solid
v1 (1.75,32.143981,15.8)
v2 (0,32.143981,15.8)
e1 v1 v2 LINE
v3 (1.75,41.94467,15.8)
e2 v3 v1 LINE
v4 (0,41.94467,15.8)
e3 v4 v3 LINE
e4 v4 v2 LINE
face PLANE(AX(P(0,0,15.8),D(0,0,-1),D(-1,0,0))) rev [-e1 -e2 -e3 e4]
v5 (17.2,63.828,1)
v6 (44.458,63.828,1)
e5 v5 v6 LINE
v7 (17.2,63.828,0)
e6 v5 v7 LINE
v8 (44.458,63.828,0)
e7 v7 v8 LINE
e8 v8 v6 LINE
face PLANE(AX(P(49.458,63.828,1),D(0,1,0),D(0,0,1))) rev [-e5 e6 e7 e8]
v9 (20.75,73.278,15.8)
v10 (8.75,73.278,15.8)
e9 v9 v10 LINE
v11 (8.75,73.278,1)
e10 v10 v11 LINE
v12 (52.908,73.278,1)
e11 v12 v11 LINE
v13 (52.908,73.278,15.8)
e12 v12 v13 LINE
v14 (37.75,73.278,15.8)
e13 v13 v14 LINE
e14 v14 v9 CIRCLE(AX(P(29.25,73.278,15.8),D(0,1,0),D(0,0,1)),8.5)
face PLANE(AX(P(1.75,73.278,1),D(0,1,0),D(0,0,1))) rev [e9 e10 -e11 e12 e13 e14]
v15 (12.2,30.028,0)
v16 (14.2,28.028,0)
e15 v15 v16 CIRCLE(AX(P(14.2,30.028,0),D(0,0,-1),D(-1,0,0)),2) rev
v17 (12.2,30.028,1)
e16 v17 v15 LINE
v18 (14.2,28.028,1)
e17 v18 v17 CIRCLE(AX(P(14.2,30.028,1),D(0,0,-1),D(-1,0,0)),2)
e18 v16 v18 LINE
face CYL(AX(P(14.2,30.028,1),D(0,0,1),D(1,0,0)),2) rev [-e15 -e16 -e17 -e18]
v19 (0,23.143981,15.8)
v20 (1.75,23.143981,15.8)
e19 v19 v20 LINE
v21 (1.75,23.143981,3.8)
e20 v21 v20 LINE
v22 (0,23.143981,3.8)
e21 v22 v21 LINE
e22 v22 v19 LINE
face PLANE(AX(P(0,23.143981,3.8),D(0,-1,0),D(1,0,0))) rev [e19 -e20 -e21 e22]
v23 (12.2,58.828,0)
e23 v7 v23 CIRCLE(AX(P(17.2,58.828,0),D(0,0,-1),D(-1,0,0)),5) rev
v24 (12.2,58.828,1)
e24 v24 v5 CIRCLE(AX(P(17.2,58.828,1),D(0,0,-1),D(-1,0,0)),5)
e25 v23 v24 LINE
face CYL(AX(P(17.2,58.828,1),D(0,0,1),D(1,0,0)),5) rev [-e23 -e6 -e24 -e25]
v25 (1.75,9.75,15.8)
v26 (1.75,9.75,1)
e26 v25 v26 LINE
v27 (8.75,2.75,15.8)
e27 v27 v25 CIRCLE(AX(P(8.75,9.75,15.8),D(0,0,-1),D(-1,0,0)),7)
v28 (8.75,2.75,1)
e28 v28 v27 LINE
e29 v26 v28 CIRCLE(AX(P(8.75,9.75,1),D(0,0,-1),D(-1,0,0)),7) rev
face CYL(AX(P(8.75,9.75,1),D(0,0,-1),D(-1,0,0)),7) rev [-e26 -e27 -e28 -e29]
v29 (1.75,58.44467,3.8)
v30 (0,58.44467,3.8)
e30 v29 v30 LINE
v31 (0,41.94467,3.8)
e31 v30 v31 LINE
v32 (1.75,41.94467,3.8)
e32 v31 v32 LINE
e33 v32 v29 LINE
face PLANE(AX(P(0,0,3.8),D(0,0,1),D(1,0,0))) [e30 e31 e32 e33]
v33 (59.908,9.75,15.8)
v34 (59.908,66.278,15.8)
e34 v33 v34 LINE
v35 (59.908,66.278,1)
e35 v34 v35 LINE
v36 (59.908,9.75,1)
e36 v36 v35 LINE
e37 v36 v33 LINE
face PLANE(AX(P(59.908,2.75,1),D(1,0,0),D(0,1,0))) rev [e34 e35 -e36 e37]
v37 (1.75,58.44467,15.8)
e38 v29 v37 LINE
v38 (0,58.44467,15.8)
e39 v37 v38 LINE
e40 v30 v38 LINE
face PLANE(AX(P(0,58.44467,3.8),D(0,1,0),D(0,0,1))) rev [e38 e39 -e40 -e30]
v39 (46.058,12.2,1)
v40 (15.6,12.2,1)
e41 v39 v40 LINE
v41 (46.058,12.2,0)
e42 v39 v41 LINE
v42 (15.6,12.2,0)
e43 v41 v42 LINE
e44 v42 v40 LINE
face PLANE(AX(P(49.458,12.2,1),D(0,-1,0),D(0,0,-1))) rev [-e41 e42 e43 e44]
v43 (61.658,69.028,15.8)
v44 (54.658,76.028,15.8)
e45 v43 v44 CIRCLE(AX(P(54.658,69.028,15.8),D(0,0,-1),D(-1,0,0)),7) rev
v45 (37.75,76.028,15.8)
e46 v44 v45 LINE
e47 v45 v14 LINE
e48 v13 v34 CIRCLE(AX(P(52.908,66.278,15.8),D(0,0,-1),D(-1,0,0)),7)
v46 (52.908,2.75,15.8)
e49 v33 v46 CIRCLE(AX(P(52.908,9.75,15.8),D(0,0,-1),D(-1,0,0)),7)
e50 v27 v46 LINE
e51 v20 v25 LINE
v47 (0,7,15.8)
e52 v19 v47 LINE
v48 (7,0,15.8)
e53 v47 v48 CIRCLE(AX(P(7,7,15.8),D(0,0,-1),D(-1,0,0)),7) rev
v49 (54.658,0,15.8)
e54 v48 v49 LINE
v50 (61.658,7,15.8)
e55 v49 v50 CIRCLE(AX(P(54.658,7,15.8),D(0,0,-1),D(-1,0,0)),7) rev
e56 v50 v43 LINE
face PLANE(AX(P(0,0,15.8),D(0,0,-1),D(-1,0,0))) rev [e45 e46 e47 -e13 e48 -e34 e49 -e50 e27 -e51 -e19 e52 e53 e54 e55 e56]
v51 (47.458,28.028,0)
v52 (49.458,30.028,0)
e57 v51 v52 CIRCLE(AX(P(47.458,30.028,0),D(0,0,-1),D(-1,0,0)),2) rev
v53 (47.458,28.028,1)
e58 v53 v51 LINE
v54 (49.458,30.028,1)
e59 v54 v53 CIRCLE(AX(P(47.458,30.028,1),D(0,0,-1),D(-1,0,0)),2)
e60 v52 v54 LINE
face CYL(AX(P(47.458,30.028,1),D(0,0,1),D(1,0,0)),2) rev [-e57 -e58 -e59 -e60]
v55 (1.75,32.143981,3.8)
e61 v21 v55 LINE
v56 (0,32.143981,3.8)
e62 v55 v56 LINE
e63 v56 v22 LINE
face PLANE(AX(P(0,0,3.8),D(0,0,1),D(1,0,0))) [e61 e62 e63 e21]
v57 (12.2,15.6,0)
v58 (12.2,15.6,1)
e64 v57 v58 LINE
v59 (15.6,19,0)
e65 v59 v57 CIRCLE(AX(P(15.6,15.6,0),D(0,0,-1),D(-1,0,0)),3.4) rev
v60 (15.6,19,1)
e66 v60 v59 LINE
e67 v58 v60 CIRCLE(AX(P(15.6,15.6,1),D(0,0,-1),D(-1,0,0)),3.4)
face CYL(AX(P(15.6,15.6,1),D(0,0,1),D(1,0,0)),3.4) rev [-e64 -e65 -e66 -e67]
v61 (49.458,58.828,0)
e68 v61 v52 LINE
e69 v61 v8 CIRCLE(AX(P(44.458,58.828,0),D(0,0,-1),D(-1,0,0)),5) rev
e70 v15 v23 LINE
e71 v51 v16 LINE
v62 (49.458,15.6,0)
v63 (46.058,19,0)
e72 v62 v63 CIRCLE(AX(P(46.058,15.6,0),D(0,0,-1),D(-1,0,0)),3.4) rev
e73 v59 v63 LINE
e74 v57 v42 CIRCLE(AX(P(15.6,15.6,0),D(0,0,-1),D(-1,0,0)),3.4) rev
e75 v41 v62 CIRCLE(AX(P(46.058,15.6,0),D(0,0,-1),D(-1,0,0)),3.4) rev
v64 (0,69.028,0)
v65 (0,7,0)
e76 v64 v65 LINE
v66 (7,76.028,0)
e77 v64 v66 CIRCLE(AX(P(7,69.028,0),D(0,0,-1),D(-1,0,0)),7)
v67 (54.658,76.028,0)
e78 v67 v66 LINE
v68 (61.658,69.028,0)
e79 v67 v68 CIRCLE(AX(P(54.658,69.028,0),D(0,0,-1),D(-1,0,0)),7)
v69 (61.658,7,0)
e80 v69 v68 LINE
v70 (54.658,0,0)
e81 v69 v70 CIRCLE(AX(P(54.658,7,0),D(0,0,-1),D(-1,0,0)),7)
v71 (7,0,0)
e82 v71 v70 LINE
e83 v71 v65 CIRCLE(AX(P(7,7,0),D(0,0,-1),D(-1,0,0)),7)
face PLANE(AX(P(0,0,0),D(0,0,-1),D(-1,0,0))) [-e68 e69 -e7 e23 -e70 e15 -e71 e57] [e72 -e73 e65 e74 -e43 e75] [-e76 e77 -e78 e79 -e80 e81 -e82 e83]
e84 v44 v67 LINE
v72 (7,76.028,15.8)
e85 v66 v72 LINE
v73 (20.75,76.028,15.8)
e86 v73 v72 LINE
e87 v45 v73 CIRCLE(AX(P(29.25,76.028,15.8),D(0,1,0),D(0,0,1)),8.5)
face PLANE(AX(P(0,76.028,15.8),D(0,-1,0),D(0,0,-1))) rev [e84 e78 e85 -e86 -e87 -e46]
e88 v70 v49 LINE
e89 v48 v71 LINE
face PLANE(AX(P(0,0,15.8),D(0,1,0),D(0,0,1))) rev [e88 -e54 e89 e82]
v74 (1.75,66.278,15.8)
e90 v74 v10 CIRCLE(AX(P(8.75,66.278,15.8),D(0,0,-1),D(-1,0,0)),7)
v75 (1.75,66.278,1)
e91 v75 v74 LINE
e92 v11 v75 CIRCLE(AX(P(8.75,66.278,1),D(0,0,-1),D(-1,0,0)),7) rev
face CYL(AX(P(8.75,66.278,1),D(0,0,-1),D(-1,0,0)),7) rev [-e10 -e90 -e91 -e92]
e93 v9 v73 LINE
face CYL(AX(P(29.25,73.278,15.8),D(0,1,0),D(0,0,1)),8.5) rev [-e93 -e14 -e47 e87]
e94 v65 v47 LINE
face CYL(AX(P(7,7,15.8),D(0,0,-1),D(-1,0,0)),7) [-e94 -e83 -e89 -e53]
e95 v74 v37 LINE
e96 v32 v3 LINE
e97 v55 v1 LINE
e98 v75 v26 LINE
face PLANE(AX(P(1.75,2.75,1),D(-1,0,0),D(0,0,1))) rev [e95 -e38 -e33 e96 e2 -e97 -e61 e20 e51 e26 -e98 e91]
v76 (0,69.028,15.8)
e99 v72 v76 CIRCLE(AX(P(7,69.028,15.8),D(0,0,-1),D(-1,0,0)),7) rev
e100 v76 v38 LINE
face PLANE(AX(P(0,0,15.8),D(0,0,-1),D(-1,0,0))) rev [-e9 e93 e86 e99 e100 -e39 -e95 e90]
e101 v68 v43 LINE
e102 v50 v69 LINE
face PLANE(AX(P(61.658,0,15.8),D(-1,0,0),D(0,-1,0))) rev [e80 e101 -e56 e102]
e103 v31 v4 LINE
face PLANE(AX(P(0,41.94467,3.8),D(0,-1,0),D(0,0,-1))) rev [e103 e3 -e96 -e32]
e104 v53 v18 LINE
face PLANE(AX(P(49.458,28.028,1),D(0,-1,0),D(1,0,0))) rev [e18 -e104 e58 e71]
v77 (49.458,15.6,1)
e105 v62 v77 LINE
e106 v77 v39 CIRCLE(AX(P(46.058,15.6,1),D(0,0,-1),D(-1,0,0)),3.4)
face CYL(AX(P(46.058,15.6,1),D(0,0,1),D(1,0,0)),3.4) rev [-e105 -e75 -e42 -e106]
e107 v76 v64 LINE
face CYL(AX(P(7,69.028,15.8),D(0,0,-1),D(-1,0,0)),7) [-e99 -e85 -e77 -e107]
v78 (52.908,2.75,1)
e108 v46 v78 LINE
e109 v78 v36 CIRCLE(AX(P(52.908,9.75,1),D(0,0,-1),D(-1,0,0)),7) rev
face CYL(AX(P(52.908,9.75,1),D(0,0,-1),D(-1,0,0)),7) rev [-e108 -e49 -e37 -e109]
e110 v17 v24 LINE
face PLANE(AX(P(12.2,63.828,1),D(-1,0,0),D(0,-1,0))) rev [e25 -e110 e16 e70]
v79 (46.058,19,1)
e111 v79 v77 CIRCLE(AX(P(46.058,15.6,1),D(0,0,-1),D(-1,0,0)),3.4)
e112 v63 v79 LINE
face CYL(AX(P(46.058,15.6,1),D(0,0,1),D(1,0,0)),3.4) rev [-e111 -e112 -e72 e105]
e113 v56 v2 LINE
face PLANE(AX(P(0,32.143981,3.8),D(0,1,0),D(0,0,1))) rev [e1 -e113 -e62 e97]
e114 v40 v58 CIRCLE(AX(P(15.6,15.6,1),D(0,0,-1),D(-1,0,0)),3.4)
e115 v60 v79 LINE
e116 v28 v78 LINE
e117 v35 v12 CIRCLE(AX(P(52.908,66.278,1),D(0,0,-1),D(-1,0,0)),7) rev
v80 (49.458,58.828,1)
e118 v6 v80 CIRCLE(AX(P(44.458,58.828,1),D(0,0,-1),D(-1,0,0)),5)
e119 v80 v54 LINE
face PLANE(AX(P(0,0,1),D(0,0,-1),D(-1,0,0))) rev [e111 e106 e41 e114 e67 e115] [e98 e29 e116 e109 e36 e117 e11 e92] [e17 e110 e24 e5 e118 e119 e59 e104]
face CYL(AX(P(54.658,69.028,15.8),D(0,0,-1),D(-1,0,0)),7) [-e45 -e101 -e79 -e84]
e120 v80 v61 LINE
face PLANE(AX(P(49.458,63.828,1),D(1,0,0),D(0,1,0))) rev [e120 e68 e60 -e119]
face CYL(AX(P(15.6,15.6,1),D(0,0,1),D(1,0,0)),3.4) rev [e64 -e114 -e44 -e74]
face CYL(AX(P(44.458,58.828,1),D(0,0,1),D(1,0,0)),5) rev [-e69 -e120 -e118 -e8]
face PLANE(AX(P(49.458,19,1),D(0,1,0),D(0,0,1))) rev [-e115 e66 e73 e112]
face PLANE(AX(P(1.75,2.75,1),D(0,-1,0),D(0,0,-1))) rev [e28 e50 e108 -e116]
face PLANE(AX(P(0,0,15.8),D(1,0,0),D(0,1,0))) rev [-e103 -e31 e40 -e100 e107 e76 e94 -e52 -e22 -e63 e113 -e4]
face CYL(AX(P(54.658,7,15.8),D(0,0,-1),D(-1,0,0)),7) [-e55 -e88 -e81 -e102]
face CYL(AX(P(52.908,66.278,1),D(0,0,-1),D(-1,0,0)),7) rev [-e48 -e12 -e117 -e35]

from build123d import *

# Parameters (mm, degrees)
SKETCH1_W                  = 61.658
SKETCH1_H                  = 76.028
BOSS_EXTRUDE1_DEPTH        = 15.8
SKETCH3_W                  = 58.158
SKETCH3_H                  = 70.528
CUT_EXTRUDE2_DEPTH         = 14.8
FILLET1_R                  = 7
FILLET2_R                  = 7
FILLET3_R                  = 7
SKETCH4_W                  = 1.75
SKETCH4_H                  = 16.5
CUT_EXTRUDE3_SWITCH_DEPTH  = 12
SKETCH5_W                  = 1.75
SKETCH5_H                  = 9
CUT_EXTRUDE4_USB_DEPTH     = 12
SKETCH6_R                  = 8.5
CUT_EXTRUDE4_SONIC_DEPTH   = 2.75
SKETCH7_W                  = 37.258
SKETCH7_H                  = 35.8
CUT_EXTRUDE5_LCDMAIN_DEPTH = 1
SKETCH8_W                  = 37.258
SKETCH8_H                  = 6.8
CUT_EXTRUDE6_LCDNOTI_DEPTH = 1
FILLET4_R                  = 5
FILLET5_R                  = 2
FILLET6_R                  = 3.4


with BuildPart() as part:
    # Sketch1 → Boss-Extrude1 (new body)
    with BuildSketch(Plane.XY):
        with Locations((30.829, 38.014)):
            Rectangle(SKETCH1_W, SKETCH1_H)
    extrude(amount=BOSS_EXTRUDE1_DEPTH)

    # Sketch3 → Cut-Extrude2 (cut)
    with BuildSketch(Plane.XY.offset(15.8)):
        with Locations((30.829, 38.014)):
            Rectangle(SKETCH3_W, SKETCH3_H)
    extrude(amount=-CUT_EXTRUDE2_DEPTH, mode=Mode.SUBTRACT)

    # Fillet1
    fillet1_edges = [part.edges().sort_by_distance(p)[0] for p in [
        (61.658, 76.028, 7.9),
    ]]
    fillet(fillet1_edges, radius=FILLET1_R)

    # Fillet2
    fillet2_edges = [part.edges().sort_by_distance(p)[0] for p in [
        (1.75, 73.278, 8.4),
        (61.658, 0, 7.9),
        (0, 0, 7.9),
    ]]
    fillet(fillet2_edges, radius=FILLET2_R)

    # Fillet3
    fillet3_edges = [part.edges().sort_by_distance(p)[0] for p in [
        (1.75, 2.75, 8.4),
        (59.908, 73.278, 8.4),
        (59.908, 2.75, 8.4),
        (0, 76.028, 7.9),
    ]]
    fillet(fillet3_edges, radius=FILLET3_R)

    # Sketch4 → Cut-Extrude3_switch (cut)
    with BuildSketch(Plane.XY.offset(15.8)):
        with Locations((0.875, 50.194669907)):
            Rectangle(SKETCH4_W, SKETCH4_H)
    extrude(amount=-CUT_EXTRUDE3_SWITCH_DEPTH, mode=Mode.SUBTRACT)

    # Sketch5 → Cut-Extrude4_usb (cut)
    with BuildSketch(Plane.XY.offset(15.8)):
        with Locations((0.875, 27.643981113)):
            Rectangle(SKETCH5_W, SKETCH5_H)
    extrude(amount=-CUT_EXTRUDE4_USB_DEPTH, mode=Mode.SUBTRACT)

    # Sketch6 → Cut-Extrude4_sonic (cut)
    with BuildSketch(Plane(origin=(0, 76.028, 0), x_dir=(1, 0, 0), z_dir=(0, 1, 0))):
        with Locations((29.25, -15.8)):
            Circle(SKETCH6_R)
    extrude(amount=-CUT_EXTRUDE4_SONIC_DEPTH, mode=Mode.SUBTRACT)

    # Sketch7 → Cut-Extrude5_LcdMain (cut)
    with BuildSketch(Plane(origin=(0, 0, 0), x_dir=(-1, 0, 0), z_dir=(0, 0, -1))):
        with Locations((-30.829, 45.928)):
            Rectangle(SKETCH7_W, SKETCH7_H)
    extrude(amount=-CUT_EXTRUDE5_LCDMAIN_DEPTH, mode=Mode.SUBTRACT)

    # Sketch8 → Cut-Extrude6_LcdNoti (cut)
    with BuildSketch(Plane(origin=(0, 0, 0), x_dir=(-1, 0, 0), z_dir=(0, 0, -1))):
        with Locations((-30.829, 15.6)):
            Rectangle(SKETCH8_W, SKETCH8_H)
    extrude(amount=-CUT_EXTRUDE6_LCDNOTI_DEPTH, mode=Mode.SUBTRACT)

    # Fillet4
    fillet4_edges = [part.edges().sort_by_distance(p)[0] for p in [
        (49.458, 63.828, 0.5),
        (12.2, 63.828, 0.5),
    ]]
    fillet(fillet4_edges, radius=FILLET4_R)

    # Fillet5
    fillet5_edges = [part.edges().sort_by_distance(p)[0] for p in [
        (49.458, 28.028, 0.5),
        (12.2, 28.028, 0.5),
    ]]
    fillet(fillet5_edges, radius=FILLET5_R)

    # Fillet6
    fillet6_edges = [part.edges().sort_by_distance(p)[0] for p in [
        (12.2, 12.2, 0.5),
        (12.2, 19, 0.5),
        (49.458, 19, 0.5),
        (49.458, 12.2, 0.5),
    ]]
    fillet(fillet6_edges, radius=FILLET6_R - 0.0001)  # a hair under: the kernel refuses the full size


solid = part.part
